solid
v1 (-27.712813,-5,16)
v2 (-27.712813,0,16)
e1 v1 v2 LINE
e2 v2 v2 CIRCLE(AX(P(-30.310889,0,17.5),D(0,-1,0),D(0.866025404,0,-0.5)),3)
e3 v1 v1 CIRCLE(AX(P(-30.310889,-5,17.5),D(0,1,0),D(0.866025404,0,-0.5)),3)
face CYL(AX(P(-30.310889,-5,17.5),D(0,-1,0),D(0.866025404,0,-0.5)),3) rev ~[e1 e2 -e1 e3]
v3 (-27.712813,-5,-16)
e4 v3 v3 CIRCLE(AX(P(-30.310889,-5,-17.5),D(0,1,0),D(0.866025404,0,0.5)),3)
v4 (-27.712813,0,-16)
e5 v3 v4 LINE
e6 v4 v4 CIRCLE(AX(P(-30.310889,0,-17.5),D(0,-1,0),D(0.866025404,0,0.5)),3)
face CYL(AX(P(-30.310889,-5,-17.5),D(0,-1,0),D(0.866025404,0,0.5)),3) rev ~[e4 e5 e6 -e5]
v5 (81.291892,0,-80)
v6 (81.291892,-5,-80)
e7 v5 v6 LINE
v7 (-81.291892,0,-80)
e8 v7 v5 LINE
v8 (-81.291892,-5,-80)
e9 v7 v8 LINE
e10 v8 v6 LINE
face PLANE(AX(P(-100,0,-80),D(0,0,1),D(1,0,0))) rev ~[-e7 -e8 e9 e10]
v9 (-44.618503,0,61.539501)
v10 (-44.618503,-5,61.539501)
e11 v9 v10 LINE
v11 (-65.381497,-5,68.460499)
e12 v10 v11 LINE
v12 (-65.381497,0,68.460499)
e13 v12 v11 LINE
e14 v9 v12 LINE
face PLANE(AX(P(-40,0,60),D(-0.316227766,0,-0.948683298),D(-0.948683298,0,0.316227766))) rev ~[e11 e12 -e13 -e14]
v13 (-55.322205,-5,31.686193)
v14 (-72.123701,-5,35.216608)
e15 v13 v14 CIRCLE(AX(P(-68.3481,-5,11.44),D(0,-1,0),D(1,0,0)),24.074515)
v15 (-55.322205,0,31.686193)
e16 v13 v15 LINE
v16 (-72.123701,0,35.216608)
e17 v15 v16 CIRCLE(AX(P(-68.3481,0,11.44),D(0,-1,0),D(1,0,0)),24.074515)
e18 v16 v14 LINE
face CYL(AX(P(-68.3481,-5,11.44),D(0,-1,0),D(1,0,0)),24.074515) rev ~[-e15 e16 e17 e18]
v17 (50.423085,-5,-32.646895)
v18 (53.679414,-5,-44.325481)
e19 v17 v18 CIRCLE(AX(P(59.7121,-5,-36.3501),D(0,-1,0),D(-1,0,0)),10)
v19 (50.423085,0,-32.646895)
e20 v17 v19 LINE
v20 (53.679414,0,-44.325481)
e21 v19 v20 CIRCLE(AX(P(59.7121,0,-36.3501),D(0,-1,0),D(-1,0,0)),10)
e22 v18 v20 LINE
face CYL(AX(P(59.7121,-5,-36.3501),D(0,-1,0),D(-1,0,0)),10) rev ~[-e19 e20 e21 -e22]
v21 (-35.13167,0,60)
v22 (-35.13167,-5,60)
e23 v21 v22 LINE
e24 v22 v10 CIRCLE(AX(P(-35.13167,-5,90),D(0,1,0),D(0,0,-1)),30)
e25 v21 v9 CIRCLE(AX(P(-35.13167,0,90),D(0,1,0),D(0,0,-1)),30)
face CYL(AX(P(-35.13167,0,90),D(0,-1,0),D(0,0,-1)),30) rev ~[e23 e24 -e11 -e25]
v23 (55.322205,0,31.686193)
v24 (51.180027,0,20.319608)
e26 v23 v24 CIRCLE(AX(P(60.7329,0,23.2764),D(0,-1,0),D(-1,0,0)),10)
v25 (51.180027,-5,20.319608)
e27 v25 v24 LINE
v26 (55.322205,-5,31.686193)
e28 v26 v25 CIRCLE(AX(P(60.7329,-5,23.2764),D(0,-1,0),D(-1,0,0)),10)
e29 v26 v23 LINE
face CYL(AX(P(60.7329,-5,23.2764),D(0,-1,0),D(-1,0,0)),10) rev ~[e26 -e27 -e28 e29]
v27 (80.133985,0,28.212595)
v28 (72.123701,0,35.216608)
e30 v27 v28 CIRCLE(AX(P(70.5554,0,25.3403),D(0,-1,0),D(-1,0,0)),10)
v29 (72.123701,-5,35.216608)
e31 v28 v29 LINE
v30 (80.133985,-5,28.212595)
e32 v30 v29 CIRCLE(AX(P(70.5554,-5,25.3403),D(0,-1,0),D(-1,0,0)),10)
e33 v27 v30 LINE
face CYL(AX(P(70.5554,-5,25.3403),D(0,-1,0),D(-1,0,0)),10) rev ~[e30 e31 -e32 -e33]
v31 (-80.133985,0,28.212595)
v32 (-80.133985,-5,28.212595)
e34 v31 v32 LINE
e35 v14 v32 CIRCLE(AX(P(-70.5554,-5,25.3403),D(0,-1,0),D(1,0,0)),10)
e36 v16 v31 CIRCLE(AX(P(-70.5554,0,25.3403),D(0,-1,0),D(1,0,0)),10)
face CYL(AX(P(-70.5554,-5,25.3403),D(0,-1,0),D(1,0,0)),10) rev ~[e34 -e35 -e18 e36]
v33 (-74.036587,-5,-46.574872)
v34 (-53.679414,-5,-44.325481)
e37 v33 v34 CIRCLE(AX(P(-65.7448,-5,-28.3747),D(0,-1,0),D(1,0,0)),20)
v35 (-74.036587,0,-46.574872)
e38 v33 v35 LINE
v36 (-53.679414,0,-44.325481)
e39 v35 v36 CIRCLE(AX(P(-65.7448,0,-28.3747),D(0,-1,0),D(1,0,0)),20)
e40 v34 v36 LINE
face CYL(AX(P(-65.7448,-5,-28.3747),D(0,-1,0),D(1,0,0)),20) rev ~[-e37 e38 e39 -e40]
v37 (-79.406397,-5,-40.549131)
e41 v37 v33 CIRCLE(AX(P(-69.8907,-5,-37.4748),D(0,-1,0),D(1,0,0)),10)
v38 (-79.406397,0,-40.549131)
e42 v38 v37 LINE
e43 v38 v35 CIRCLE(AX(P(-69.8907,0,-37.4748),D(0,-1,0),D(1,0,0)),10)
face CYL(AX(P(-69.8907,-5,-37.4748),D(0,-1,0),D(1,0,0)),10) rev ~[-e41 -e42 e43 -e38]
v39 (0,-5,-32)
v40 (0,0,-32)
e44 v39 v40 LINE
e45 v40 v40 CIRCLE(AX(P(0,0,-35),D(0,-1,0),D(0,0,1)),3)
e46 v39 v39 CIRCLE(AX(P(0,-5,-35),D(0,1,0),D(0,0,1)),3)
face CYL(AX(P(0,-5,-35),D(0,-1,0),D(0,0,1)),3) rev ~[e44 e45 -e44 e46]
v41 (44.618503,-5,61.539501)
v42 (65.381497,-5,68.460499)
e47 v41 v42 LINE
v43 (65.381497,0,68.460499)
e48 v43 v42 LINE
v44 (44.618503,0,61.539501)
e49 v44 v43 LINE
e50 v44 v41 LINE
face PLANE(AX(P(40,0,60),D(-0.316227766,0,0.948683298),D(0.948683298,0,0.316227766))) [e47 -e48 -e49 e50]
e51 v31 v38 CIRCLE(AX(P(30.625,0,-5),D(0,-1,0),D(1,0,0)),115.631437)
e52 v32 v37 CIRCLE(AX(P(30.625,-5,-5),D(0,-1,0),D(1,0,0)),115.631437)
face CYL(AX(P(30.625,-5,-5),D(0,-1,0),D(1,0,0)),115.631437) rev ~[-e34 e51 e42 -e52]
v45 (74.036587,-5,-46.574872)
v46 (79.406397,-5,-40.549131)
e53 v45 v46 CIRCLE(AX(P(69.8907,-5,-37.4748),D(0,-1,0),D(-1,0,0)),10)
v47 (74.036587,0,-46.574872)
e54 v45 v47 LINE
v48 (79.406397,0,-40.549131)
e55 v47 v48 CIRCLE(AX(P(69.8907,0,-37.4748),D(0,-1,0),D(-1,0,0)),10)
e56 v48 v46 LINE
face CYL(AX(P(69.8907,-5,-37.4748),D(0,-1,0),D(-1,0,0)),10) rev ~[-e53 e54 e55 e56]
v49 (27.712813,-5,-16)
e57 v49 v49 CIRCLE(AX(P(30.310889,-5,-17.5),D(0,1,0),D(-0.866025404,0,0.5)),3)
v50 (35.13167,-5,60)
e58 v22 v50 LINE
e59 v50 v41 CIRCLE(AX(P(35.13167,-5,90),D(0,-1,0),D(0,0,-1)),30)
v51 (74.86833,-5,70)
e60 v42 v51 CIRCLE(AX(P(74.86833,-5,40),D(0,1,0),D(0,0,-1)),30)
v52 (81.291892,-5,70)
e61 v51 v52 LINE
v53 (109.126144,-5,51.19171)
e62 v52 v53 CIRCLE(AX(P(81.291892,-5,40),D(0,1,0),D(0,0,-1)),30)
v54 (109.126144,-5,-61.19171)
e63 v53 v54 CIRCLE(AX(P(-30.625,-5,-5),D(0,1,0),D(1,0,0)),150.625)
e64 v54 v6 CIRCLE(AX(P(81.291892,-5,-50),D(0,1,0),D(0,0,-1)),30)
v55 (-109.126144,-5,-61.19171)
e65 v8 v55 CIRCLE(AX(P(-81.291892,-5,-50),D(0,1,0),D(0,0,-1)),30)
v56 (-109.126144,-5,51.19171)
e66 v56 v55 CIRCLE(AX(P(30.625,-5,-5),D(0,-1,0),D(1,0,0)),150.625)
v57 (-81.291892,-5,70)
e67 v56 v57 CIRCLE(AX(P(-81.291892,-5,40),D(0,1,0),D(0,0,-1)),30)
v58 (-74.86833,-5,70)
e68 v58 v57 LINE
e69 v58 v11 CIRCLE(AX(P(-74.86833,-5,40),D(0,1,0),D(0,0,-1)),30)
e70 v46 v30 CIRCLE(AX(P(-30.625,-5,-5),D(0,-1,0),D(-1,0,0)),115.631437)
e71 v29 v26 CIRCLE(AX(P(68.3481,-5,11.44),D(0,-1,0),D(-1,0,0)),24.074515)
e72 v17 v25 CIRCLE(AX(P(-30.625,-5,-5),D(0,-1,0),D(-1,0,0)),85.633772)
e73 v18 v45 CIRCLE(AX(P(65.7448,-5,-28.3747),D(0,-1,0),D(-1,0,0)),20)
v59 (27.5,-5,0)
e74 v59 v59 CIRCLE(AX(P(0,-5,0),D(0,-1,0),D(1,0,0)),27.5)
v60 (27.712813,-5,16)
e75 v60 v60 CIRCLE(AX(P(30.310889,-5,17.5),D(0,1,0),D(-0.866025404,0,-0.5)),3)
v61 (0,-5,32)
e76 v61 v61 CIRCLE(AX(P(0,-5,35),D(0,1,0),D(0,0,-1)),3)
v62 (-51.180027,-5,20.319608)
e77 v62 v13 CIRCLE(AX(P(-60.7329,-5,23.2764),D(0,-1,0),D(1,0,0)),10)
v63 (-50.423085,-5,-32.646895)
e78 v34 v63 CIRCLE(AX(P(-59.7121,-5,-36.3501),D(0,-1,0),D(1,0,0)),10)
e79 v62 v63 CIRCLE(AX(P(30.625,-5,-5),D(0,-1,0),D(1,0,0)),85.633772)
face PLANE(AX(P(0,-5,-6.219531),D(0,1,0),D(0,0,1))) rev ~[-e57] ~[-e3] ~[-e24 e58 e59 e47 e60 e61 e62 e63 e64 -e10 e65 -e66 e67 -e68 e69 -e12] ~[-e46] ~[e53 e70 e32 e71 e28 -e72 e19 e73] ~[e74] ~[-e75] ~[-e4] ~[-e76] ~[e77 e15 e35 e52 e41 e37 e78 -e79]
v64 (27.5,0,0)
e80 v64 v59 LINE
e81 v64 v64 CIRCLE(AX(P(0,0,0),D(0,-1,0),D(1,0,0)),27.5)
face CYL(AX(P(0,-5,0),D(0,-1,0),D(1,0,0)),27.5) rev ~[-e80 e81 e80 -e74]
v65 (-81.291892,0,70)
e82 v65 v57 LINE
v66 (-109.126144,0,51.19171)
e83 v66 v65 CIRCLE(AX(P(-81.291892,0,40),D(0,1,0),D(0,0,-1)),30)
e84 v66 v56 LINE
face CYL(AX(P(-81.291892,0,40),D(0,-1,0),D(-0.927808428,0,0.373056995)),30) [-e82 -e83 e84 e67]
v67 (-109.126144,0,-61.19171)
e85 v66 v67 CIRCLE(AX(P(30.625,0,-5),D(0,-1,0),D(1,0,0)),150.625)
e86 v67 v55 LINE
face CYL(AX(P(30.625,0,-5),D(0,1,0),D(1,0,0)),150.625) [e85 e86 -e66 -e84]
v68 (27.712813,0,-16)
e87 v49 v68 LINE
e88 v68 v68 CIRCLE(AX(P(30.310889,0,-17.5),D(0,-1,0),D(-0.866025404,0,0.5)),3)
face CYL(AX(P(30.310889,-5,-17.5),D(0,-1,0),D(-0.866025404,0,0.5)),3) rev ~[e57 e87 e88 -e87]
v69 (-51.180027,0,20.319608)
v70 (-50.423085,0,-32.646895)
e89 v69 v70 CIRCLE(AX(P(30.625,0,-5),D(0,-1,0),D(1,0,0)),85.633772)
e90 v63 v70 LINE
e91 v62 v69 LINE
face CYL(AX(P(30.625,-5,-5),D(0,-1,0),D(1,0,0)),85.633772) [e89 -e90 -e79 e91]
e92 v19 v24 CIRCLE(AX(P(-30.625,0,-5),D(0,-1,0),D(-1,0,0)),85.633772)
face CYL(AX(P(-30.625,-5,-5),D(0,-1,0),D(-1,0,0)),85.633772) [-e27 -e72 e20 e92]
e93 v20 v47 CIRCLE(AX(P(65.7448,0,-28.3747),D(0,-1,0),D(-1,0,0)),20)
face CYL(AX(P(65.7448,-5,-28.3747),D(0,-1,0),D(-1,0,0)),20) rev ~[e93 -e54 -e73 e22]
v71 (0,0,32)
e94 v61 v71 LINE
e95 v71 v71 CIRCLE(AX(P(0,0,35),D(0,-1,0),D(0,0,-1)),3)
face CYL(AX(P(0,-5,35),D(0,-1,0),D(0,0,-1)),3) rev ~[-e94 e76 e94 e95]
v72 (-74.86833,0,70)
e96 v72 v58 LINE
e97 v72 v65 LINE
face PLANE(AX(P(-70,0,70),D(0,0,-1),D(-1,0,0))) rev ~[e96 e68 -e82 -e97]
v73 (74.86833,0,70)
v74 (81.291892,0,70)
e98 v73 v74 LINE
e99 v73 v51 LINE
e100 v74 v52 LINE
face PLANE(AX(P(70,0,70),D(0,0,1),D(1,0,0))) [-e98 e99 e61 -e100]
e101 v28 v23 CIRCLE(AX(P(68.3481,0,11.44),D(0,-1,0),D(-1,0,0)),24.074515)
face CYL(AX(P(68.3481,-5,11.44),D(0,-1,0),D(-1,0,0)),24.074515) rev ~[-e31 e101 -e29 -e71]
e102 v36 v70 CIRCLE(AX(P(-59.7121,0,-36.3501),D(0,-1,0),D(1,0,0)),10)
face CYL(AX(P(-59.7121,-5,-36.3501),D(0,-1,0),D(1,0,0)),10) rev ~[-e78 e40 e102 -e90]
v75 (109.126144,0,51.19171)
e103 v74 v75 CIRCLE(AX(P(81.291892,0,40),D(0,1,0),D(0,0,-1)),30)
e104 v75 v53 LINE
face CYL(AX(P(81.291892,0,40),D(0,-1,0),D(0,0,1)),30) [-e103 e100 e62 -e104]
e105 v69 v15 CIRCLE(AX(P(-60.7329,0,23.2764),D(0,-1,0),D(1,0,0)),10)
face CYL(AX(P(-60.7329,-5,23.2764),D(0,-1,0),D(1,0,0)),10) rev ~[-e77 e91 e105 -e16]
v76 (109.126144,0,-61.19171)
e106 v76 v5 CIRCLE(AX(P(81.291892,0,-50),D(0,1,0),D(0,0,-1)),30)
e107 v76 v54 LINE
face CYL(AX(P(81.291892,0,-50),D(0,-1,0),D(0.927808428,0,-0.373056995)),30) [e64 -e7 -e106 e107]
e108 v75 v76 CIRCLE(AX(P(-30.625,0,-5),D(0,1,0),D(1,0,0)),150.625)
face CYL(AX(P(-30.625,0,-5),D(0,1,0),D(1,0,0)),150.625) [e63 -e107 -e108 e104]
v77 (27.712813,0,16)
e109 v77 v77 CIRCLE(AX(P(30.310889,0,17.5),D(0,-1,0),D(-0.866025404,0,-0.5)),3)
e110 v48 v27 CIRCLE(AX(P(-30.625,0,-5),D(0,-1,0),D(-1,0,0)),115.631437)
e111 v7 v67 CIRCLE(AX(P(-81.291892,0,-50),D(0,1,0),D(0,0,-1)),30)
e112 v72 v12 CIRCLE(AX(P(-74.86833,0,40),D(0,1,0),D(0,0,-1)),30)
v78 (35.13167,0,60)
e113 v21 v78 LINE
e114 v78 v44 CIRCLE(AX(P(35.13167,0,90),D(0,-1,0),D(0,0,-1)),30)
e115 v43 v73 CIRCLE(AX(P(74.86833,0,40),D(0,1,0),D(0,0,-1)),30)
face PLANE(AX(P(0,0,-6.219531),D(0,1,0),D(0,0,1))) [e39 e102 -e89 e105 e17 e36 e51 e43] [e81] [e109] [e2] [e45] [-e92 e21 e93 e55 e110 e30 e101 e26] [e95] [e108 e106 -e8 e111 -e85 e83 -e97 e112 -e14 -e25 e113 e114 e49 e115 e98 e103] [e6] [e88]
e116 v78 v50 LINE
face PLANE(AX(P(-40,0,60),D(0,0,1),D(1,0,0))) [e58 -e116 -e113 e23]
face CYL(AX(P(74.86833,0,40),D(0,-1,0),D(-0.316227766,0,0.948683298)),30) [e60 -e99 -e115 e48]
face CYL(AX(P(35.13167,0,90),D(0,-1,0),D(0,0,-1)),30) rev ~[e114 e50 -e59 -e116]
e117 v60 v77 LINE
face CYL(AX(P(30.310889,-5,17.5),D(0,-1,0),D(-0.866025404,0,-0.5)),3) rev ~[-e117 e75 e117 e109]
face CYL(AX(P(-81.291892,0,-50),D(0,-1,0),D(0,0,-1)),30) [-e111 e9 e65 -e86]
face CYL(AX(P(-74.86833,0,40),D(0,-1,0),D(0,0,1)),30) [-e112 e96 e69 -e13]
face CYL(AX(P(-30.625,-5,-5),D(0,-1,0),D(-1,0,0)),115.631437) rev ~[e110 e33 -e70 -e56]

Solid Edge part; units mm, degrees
sketch "Sketch1" plane through (0, 0, 0) normal (0, -1, 0) x (1, 0, 0)
  line L0 (-40, 60) -> (40, 60)
  line L1 (40, 60) -> (70, 70)
  line L2 (70, 70) -> (100, 70)
  arc A0 (100, 70) -> (100, -80) centre (-30.625, -5) cw
  line L3 (-100, -80) -> (100, -80)
  arc A1 (-100, 70) -> (-100, -80) centre (30.625, -5) ccw
  line L4 (-70, 70) -> (-100, 70)
  line L5 (-40, 60) -> (-70, 70)
  dimension "D1" = 60
  dimension "D2" = 10
  dimension "D3" = 30
  dimension "D4" = 30
  dimension "D5" = 80
  dimension "D6" = 120
extrude "Protrusion1" add sketch "Sketch1" along normal blind 5
fillet "Round_1" radius 30 8 edges at (100, -2.5, -80) (-100, -2.5, -80) (-100, -2.5, 70) (-70, -2.5, 70) (-40, -2.5, 60) (40, -2.5, 60) (70, -2.5, 70) (100, -2.5, 70)
sketch "Sketch2" plane through (0, -5, -2.5) normal (0, -1, 0) x (1, 0, 0)
  circle A0 centre (0, 2.5) radius 27.5
  dimension "D1" = 55
extrude "ExtrudedCutout_1" cut sketch "Sketch2" against normal blind 45.5 and the other way blind 29.5
hole "Hole_1" at (0, -5, 35) direction (0, 1, 0) diameter 6 end up to next
pattern_circular "Pattern1" count 6 over 360 about axis through (0, -5, 0) along (0, 1, 0) of "Hole_1"
sketch "Sketch3" plane through (0, -5, -5) normal (0, -1, 0) x (1, 0, 0)
  arc A0 (-72.1237, 40.2166) -> (-55.3222, 36.6862) centre (-68.3481, 16.44) cw
  arc A1 (-55.3222, 36.6862) -> (-51.18, 25.3196) centre (-60.7329, 28.2764) cw
  arc A2 (-51.18, 25.3196) -> (-50.4231, -27.6469) centre (30.625, 0) ccw
  arc A3 (-53.6794, -39.3255) -> (-50.4231, -27.6469) centre (-59.7121, -31.3501) ccw
  arc A4 (-53.6794, -39.3255) -> (-74.0366, -41.5749) centre (-65.7448, -23.3747) cw
  arc A5 (-74.0366, -41.5749) -> (-79.4063, -35.5491) centre (-69.8907, -32.4748) cw
  arc A6 (-79.4063, -35.5491) -> (-80.134, 33.2126) centre (30.625, 0) cw
  arc A7 (-80.134, 33.2126) -> (-72.1237, 40.2166) centre (-70.5554, 30.3403) cw
  dimension "D1" = 30
  dimension "D2" = 30
  dimension "D3" = 10
  dimension "D4" = 10
  dimension "D5" = 20
extrude "ExtrudedCutout_2" cut sketch "Sketch3" against normal blind 23.5 and the other way blind 37.5
mirror "Mirror1" about plane through (0, 0, 0) normal (1, 0, 0) of "ExtrudedCutout_2"
properties material "Epoxy, cast rigid"
